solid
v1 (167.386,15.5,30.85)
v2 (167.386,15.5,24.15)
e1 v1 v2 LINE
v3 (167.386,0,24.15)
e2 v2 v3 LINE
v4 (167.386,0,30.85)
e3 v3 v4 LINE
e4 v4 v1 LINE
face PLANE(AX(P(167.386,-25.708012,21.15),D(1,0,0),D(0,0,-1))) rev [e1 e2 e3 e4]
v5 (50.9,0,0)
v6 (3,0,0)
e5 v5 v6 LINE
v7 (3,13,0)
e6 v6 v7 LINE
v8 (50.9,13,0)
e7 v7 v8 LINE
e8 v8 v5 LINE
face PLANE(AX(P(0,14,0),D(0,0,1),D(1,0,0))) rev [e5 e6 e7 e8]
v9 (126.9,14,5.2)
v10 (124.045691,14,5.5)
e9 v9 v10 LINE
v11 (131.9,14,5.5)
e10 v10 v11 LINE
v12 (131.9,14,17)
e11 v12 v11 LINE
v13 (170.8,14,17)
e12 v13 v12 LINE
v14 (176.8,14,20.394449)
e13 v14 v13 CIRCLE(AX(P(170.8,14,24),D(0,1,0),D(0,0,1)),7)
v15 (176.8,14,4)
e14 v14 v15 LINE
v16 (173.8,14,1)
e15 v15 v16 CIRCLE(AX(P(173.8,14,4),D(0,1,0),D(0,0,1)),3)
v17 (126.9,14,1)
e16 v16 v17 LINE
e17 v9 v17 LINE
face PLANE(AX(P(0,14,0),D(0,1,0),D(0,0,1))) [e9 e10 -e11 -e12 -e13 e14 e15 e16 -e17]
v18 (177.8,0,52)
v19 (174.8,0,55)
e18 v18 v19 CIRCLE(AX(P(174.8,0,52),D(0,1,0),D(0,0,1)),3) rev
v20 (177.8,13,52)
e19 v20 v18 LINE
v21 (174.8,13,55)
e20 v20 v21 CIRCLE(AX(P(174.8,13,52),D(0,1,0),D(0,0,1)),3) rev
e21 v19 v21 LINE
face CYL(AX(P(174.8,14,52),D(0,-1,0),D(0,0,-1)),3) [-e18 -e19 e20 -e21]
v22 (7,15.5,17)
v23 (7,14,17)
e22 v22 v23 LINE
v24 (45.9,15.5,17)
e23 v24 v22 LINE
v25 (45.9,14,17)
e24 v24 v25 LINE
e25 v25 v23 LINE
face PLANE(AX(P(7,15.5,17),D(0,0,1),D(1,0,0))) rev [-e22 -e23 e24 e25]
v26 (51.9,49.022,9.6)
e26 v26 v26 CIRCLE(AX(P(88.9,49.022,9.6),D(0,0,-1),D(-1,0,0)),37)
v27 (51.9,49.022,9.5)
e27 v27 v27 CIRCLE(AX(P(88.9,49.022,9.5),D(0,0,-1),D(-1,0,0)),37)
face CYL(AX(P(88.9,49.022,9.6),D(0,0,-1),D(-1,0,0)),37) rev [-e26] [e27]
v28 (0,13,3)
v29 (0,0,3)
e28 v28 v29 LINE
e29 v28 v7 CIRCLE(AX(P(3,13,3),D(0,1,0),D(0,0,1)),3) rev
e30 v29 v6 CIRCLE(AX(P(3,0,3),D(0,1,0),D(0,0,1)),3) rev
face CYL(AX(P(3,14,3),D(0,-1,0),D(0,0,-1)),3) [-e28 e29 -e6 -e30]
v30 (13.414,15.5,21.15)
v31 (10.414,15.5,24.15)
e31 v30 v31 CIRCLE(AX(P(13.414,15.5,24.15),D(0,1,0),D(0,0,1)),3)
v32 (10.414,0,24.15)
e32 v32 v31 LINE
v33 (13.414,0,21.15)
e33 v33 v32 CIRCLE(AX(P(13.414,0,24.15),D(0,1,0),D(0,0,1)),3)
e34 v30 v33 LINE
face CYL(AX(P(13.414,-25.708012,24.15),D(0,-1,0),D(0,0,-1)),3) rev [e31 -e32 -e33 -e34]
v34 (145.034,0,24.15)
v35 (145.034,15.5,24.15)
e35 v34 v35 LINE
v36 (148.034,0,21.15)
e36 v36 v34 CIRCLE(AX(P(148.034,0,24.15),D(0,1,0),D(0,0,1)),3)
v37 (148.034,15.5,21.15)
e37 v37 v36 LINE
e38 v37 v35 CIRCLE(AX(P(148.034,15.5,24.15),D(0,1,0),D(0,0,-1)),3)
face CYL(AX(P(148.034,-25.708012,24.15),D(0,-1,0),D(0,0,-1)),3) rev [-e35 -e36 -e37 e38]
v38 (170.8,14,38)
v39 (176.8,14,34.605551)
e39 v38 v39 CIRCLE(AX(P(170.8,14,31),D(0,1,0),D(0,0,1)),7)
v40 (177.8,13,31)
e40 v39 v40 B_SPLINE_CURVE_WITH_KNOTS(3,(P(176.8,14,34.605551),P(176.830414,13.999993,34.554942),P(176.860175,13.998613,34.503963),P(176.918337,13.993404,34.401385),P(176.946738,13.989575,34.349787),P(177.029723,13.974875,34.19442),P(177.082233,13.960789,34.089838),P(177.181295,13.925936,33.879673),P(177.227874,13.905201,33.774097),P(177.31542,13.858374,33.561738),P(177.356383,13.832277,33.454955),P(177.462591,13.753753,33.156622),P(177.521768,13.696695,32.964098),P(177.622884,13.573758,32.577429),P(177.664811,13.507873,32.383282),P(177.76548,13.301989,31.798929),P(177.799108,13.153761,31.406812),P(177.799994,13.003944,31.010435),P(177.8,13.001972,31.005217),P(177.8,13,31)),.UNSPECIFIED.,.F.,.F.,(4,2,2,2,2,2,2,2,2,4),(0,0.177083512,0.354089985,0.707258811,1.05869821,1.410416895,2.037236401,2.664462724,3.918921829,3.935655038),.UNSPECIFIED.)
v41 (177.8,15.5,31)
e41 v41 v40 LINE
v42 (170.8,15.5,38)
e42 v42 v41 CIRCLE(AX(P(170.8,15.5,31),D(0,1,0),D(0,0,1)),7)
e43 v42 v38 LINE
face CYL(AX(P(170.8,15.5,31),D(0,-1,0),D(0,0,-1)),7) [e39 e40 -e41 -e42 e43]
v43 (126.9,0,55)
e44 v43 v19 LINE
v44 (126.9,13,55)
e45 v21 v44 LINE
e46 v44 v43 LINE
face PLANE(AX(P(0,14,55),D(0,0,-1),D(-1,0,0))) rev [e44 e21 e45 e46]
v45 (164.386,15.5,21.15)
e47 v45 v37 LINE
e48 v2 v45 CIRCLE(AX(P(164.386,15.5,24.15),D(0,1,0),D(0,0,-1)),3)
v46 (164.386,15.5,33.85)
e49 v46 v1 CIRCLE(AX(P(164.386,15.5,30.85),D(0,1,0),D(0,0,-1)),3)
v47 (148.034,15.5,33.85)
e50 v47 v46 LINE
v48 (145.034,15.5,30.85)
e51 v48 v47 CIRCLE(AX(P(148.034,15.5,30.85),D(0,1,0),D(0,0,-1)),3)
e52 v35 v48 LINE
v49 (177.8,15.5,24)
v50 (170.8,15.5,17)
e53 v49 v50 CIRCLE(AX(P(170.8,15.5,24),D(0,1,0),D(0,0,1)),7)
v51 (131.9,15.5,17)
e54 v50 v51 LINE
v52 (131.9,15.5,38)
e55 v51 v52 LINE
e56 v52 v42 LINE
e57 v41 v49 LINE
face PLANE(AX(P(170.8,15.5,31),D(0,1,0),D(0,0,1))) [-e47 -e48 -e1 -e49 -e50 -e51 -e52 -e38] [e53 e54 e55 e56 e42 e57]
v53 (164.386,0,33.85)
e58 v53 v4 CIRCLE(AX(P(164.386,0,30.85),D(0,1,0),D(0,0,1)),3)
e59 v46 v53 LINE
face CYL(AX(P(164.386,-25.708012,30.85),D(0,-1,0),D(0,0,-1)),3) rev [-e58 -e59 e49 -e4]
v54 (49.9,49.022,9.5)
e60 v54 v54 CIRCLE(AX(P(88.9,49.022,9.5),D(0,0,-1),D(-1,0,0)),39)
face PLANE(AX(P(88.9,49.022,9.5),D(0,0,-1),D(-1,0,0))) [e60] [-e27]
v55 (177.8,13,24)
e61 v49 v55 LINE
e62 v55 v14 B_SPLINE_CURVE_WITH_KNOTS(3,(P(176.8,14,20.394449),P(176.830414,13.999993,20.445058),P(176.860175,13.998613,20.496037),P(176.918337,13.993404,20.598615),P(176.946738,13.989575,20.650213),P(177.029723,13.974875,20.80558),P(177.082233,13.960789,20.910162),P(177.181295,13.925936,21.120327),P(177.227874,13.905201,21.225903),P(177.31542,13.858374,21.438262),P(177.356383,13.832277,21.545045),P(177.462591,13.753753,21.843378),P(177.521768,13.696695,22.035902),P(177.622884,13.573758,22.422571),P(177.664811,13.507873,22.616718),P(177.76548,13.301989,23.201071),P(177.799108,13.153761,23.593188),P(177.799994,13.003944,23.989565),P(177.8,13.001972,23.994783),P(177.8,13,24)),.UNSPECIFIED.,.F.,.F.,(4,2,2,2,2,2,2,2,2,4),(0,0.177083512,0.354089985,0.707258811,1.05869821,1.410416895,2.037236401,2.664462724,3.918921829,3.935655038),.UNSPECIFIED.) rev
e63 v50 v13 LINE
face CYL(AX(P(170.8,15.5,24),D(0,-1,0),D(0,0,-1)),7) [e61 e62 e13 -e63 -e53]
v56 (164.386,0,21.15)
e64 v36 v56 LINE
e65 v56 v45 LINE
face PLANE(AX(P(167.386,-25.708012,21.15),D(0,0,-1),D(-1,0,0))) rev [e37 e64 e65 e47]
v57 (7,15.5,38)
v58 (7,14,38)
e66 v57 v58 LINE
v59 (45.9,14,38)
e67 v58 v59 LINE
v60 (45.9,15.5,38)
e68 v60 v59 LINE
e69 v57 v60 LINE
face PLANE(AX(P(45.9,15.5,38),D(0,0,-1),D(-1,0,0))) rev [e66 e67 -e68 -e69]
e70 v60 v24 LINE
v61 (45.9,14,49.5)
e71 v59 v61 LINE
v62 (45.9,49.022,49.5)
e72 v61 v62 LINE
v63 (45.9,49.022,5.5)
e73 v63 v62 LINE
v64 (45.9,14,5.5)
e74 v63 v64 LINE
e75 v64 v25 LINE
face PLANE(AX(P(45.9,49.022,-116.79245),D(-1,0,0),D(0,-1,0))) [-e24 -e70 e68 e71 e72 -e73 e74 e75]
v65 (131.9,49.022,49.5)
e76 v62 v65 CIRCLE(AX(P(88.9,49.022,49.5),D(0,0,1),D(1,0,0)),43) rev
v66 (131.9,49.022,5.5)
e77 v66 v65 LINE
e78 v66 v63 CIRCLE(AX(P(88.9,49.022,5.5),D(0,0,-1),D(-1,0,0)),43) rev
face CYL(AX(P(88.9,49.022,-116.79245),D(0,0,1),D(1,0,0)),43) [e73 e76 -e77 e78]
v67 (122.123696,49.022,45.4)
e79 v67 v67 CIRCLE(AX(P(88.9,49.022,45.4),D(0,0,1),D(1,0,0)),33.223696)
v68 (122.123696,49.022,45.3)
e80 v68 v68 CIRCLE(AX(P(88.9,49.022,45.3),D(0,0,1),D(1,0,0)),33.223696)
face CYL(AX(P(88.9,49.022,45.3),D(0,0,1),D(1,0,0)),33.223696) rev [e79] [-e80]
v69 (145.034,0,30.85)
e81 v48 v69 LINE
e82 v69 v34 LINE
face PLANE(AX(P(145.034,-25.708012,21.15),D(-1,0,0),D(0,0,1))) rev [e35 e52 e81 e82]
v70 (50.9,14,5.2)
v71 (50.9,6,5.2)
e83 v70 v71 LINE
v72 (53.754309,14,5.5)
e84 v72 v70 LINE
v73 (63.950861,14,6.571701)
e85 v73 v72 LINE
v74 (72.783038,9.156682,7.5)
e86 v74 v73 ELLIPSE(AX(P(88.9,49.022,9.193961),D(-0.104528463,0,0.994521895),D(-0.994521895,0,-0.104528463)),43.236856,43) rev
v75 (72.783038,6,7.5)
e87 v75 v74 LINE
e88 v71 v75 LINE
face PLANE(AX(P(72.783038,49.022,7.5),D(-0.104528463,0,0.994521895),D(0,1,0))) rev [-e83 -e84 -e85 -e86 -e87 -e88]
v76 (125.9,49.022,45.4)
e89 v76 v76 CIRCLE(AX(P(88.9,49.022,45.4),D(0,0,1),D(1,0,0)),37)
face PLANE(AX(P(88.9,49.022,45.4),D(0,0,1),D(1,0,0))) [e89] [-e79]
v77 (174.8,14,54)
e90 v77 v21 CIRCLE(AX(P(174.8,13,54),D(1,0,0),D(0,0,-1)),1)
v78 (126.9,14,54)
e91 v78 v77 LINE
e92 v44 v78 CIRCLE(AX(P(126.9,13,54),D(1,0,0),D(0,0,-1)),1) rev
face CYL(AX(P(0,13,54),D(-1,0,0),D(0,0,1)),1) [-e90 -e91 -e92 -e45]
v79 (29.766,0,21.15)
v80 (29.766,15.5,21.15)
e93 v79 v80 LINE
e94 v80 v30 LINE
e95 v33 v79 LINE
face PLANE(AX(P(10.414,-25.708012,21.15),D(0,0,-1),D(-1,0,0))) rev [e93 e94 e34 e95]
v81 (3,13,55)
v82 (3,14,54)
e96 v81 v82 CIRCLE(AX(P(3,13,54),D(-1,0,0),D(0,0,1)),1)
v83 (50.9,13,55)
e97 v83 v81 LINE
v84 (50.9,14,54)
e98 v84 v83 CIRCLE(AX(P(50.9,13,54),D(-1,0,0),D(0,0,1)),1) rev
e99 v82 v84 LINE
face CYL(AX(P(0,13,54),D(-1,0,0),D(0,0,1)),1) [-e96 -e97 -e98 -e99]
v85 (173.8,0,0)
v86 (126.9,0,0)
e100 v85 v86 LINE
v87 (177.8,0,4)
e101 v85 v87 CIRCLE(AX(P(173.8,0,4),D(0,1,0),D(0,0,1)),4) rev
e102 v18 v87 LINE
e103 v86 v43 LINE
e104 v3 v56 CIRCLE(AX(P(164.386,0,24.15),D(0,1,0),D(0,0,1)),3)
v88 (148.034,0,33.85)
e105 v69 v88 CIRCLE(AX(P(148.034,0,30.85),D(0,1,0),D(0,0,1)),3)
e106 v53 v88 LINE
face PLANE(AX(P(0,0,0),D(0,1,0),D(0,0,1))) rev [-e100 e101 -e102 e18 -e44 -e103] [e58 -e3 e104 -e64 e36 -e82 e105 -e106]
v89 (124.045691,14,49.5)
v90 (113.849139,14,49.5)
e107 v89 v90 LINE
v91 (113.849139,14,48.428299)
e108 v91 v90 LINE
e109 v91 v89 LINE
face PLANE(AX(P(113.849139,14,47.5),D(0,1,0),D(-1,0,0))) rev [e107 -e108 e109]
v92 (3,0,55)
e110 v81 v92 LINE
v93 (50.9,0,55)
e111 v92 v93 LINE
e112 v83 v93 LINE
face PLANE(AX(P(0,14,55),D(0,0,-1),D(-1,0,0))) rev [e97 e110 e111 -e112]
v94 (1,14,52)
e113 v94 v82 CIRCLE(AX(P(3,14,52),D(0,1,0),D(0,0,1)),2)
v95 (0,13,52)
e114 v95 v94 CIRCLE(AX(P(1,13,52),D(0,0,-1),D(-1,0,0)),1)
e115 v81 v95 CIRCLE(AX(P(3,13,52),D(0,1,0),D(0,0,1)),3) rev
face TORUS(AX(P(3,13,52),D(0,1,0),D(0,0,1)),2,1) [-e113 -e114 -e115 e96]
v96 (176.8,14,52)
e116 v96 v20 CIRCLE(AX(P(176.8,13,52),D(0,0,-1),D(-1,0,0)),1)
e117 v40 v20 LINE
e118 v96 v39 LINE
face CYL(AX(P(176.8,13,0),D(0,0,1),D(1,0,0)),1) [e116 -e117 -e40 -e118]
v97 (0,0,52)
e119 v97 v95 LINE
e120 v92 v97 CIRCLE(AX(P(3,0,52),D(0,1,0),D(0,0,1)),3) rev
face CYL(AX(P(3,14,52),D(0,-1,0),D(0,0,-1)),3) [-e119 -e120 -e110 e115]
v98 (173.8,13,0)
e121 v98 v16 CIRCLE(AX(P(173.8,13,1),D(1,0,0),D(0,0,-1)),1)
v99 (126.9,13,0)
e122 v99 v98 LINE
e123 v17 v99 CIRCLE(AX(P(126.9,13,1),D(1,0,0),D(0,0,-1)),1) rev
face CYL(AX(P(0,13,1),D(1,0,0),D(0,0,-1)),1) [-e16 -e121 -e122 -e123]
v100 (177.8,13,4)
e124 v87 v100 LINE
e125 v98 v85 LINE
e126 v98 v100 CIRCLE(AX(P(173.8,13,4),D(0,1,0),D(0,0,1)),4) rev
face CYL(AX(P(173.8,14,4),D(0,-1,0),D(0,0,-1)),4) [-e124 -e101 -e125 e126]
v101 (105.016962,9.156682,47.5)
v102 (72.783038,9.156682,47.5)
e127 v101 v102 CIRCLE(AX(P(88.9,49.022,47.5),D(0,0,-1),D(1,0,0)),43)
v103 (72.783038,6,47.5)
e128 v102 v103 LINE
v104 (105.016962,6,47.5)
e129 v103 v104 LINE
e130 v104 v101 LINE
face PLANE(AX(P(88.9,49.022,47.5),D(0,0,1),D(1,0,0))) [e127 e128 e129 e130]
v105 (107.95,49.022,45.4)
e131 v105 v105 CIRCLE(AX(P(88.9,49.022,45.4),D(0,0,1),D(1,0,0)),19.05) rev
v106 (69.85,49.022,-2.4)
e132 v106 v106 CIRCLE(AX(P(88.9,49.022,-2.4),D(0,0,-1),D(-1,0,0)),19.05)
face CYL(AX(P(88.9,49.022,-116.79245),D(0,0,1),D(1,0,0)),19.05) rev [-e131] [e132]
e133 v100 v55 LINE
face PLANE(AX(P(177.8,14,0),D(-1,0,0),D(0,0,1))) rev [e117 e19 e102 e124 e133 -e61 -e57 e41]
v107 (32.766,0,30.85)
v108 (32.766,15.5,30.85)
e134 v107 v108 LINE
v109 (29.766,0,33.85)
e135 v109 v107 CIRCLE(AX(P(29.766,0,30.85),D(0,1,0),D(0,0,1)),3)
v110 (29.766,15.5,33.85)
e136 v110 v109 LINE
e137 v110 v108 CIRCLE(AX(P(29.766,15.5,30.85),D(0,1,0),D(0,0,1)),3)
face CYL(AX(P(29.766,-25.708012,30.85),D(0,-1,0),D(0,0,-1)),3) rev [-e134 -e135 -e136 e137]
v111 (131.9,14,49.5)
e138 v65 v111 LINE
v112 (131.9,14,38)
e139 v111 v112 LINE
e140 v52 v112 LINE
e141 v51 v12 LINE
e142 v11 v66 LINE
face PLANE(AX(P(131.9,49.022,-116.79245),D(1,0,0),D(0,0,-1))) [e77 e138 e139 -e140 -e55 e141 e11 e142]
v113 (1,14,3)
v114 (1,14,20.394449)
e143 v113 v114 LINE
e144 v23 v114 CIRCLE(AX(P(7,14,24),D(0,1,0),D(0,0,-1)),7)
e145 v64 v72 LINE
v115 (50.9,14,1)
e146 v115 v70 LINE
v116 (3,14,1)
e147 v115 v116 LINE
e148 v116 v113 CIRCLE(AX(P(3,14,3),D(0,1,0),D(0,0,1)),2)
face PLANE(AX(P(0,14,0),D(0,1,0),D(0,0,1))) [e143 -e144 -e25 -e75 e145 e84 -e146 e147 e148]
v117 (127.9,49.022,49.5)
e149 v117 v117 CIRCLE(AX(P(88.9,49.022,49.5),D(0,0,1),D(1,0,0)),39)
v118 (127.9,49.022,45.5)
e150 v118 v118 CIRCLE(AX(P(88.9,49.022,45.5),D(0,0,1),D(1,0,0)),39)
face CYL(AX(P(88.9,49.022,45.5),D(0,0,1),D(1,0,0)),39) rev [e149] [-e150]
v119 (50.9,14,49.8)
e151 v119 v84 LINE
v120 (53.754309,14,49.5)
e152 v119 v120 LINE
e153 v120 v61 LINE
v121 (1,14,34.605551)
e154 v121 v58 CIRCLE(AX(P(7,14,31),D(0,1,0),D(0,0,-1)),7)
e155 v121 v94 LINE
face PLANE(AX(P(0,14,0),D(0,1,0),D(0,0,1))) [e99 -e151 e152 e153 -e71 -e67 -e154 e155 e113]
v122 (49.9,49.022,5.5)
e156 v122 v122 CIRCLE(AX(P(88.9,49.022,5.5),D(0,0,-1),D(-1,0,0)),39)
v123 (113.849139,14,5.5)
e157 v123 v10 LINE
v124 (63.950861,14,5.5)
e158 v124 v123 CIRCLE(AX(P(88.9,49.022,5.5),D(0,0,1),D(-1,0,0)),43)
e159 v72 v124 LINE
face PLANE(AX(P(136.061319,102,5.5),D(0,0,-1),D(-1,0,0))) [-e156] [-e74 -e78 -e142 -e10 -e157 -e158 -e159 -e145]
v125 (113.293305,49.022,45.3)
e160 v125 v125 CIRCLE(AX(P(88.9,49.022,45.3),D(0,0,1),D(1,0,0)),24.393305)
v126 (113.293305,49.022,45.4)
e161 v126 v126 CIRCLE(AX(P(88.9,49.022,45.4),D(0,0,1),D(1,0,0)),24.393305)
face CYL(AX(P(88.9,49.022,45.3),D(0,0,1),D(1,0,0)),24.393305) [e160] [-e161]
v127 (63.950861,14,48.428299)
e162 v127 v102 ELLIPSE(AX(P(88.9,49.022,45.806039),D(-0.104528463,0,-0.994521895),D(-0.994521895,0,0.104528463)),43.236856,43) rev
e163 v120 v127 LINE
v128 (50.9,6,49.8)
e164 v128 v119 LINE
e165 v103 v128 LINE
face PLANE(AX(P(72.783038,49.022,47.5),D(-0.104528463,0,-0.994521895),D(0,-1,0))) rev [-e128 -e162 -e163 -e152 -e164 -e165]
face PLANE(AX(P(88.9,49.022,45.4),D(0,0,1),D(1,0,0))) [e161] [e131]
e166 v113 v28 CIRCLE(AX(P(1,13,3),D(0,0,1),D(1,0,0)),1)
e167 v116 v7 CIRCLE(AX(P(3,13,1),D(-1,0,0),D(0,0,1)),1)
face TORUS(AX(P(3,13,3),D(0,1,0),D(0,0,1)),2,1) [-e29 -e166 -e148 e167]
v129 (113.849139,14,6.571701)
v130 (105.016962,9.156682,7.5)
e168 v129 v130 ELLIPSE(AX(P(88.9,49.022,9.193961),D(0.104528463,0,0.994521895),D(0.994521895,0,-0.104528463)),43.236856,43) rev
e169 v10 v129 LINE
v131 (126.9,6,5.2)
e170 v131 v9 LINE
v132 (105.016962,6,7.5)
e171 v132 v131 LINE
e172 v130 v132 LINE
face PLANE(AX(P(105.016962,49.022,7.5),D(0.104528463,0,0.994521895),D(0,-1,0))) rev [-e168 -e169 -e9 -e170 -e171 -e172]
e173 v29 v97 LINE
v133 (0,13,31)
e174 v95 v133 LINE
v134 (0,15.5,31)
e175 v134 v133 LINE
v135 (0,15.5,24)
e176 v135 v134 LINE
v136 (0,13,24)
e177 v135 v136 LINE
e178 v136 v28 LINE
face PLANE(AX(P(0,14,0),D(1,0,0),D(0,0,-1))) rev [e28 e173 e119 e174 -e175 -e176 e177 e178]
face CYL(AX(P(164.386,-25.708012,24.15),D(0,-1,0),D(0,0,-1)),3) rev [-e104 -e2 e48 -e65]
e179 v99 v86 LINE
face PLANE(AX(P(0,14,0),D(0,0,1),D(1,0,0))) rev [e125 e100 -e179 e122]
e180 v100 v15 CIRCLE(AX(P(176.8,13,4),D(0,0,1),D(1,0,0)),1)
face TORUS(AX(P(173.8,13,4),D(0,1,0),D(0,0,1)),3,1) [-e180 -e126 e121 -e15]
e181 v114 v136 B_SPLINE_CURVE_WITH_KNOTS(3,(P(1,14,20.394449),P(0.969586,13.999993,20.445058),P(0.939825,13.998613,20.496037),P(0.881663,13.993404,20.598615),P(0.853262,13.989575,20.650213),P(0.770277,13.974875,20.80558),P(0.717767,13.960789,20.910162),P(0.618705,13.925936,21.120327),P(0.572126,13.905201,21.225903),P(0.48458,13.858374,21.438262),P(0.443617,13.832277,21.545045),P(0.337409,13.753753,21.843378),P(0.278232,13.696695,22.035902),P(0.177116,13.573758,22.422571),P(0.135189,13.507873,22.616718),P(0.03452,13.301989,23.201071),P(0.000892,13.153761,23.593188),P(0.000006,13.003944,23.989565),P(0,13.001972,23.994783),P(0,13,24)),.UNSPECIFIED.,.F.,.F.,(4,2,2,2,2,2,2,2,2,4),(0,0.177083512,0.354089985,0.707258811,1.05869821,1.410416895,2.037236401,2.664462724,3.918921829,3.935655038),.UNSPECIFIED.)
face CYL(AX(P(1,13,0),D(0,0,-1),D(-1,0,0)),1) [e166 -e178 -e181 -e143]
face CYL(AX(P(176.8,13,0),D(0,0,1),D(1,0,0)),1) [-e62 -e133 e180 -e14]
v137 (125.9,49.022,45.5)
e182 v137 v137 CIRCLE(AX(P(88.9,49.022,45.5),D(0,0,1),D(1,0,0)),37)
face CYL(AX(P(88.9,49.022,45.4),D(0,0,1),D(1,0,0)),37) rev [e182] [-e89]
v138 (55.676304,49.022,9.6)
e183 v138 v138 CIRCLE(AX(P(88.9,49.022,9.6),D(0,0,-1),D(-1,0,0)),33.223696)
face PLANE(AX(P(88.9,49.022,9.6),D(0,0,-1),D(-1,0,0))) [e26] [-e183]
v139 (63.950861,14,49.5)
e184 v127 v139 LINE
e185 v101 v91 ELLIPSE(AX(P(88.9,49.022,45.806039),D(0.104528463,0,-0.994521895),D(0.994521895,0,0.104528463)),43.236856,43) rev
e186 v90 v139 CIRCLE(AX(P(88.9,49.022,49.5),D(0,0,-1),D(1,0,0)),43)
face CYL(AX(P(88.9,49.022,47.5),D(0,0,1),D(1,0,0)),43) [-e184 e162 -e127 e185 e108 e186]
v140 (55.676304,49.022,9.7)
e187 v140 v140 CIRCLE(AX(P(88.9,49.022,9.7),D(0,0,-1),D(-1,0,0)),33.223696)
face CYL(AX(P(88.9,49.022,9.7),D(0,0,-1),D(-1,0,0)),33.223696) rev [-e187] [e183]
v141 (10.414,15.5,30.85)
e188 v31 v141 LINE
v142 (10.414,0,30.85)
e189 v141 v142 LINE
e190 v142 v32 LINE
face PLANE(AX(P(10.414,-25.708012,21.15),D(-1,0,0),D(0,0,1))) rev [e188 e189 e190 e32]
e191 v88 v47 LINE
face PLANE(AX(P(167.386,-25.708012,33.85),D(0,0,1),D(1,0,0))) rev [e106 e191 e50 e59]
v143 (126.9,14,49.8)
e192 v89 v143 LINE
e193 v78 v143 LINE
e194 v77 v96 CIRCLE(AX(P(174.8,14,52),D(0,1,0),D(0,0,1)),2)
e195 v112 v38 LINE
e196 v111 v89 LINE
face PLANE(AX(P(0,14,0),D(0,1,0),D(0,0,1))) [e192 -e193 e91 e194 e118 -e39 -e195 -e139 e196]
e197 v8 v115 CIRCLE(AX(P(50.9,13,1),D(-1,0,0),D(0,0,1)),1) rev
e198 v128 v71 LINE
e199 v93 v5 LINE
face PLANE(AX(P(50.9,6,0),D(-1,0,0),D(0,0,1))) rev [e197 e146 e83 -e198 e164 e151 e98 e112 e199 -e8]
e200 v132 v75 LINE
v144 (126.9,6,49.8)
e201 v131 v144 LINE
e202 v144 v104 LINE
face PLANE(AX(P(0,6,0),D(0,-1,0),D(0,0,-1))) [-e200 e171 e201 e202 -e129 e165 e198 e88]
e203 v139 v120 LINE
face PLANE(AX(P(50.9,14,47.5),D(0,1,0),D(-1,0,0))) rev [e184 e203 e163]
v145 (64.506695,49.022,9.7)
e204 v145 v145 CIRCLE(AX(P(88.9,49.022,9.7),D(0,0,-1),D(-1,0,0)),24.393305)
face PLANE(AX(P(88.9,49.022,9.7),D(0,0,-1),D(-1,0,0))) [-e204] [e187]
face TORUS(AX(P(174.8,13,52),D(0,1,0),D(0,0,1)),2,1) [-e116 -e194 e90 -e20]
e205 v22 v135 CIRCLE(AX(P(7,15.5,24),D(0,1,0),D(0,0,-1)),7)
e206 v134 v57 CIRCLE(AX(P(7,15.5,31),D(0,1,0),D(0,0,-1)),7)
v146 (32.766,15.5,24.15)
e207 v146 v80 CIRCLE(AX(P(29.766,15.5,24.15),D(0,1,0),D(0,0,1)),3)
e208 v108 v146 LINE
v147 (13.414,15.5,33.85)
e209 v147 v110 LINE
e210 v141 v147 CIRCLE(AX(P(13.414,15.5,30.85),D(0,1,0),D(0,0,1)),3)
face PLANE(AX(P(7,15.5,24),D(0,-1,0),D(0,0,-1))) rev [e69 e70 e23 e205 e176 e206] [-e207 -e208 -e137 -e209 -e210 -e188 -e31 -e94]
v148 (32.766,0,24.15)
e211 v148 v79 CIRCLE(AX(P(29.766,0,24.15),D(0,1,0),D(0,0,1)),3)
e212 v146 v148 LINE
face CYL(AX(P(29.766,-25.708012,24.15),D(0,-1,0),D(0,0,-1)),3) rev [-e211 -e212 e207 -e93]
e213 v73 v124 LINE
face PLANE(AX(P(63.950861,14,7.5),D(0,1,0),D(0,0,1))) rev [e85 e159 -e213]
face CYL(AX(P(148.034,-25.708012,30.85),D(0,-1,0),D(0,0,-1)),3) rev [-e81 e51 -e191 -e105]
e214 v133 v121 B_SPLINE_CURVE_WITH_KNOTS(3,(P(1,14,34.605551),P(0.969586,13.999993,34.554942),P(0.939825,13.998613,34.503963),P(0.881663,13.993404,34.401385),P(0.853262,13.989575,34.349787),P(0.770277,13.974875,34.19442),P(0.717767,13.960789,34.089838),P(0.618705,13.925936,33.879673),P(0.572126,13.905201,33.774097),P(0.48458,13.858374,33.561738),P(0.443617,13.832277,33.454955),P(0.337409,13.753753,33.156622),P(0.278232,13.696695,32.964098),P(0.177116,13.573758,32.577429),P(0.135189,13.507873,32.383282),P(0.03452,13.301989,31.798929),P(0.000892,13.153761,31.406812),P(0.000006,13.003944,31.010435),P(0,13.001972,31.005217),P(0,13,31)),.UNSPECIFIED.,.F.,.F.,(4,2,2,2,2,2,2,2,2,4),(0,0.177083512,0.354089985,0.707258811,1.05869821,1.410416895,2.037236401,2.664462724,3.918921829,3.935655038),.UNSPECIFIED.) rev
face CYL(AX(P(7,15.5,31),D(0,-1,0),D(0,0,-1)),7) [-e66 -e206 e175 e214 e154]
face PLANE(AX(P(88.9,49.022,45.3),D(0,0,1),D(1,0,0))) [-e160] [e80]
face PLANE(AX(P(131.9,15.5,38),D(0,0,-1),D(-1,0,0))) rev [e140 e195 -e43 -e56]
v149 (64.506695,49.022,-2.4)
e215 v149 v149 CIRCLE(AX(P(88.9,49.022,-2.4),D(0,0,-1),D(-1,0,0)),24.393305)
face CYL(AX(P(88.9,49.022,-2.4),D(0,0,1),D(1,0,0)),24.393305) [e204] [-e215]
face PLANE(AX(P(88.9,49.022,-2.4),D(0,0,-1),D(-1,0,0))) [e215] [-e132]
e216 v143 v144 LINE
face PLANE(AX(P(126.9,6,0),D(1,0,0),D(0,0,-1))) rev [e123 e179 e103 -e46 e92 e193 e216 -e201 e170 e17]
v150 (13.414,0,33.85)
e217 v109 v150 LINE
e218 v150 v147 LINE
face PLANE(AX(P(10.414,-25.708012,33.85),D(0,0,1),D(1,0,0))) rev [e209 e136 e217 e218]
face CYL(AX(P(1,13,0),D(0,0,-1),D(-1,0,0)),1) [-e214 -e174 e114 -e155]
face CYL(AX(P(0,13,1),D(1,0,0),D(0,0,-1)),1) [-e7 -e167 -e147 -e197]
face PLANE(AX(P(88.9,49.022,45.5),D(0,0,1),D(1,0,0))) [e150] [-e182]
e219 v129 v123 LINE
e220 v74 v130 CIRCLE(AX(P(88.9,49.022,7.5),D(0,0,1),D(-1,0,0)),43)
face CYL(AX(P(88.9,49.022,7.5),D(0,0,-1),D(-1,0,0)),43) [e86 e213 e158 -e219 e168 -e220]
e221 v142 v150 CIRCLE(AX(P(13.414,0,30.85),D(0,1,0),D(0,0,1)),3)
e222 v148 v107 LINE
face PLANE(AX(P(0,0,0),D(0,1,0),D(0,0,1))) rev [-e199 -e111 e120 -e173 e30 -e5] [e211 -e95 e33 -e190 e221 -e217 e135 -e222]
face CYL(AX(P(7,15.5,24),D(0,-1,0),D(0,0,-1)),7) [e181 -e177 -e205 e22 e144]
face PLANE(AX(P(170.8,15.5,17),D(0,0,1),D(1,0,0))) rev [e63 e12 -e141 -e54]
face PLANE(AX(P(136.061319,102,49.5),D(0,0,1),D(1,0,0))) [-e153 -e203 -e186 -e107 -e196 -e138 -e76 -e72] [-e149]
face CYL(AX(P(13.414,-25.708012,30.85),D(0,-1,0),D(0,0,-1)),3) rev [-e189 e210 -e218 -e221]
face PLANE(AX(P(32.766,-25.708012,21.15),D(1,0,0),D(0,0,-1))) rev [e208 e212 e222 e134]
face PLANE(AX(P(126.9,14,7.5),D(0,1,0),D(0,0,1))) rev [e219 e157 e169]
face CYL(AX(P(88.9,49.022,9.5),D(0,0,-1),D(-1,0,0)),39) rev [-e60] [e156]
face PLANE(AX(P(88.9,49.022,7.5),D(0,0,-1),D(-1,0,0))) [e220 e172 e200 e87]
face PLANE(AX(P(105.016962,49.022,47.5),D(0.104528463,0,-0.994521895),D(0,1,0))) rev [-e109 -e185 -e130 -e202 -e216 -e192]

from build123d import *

# Parameters (mm, degrees)
CROQUIS1_W              = 177.8
CROQUIS1_H              = 55
SALIENTE_EXTRUIR1_DEPTH = 14
CROQUIS2_R              = 19.05
SALIENTE_EXTRUIR2_DEPTH = 55
CROQUIS3_W              = 102.441548107
CROQUIS3_H              = 5.5
CORTAR_EXTRUIR1_DEPTH   = 88
CROQUIS4_W              = 76
CROQUIS4_H              = 55
CORTAR_EXTRUIR2_DEPTH   = 6
CROQUIS5_W              = 76
CROQUIS5_H              = 5.5
CORTAR_EXTRUIR3_DEPTH   = 20
CROQUIS6_R              = 39
CORTAR_EXTRUIR4_DEPTH   = 4
CORTAR_EXTRUIR5_START   = -4
CROQUIS7_R              = 39
CORTAR_EXTRUIR5_DEPTH   = 4
CROQUIS8_R              = 37
CORTAR_EXTRUIR6_DEPTH   = 0.1
CROQUIS9_R              = 24.393304637
CROQUIS9_R_2            = 19.05
SALIENTE_EXTRUIR3_DEPTH = 12
CORTAR_EXTRUIR7_START   = -0.1
CROQUIS11_R             = 33.223696355
CROQUIS11_R_2           = 24.393304637
CORTAR_EXTRUIR7_DEPTH   = 0.1
REDONDEO1_R             = 3
CORTAR_EXTRUIR8_START   = -0.1
CROQUIS12_R             = 37
CORTAR_EXTRUIR8_DEPTH   = 0.1
CROQUIS13_R             = 33.223696355
CROQUIS13_R_2           = 24.393304637
CORTAR_EXTRUIR9_DEPTH   = 0.1
CORTAR_EXTRUIR10_DEPTH  = 2
CHAFL_N1_SIZE           = 2.3
CHAFL_N1_SIZE_2         = 21.883038245
CORTAR_EXTRUIR11_START  = -2
CORTAR_EXTRUIR11_DEPTH  = 2
CHAFL_N2_SIZE           = 2.3
CHAFL_N2_SIZE_2         = 21.883038245
REDONDEO3_R             = 4
CROQUIS17_W             = 22.352
CROQUIS17_H             = 12.7
CORTAR_EXTRUIR12_DEPTH  = 14
REDONDEO4_R             = 3
SALIENTE_EXTRUIR4_DEPTH = 1.5
REDONDEO5_R             = 1


with BuildPart() as part:
    # Croquis1 → Saliente-Extruir1 (new body)
    with BuildSketch(Plane(origin=(0, 0, 0), x_dir=(1, 0, 0), z_dir=(0, 1, 0))):
        with Locations((88.9, -27.5)):
            Rectangle(CROQUIS1_W, CROQUIS1_H)
    extrude(amount=SALIENTE_EXTRUIR1_DEPTH)

    # Croquis2 → Saliente-Extruir2 (add)
    with BuildSketch(Plane.XY.offset(55)):
        with BuildLine():
            Line((45.9, 49.022), (45.9, 13))
            Line((45.9, 13), (131.9, 13))
            Line((131.9, 13), (131.9, 49.022))
            ThreePointArc((131.9, 49.022), (88.9, 92.022), (45.9, 49.022))
        make_face()
        with Locations((88.9, 49.022)):
            Circle(CROQUIS2_R, mode=Mode.SUBTRACT)
    extrude(amount=-SALIENTE_EXTRUIR2_DEPTH)

    # Croquis3 → Cortar-Extruir1 (cut)
    with BuildSketch(Plane(origin=(0, 14, 0), x_dir=(1, 0, 0), z_dir=(0, 1, 0))):
        with Locations((84.840544714, -2.75)):
            Rectangle(CROQUIS3_W, CROQUIS3_H)
        with Locations((84.840544714, -52.25)):
            Rectangle(CROQUIS3_W, CROQUIS3_H)
    extrude(amount=CORTAR_EXTRUIR1_DEPTH, mode=Mode.SUBTRACT)

    # Croquis4 → Cortar-Extruir2 (cut)
    with BuildSketch(Plane.XZ):
        with Locations((88.9, 27.5)):
            Rectangle(CROQUIS4_W, CROQUIS4_H)
    extrude(amount=-CORTAR_EXTRUIR2_DEPTH, mode=Mode.SUBTRACT)

    # Croquis5 → Cortar-Extruir3 (cut)
    with BuildSketch(Plane.XZ.offset(-6)):
        with Locations((88.9, 2.75)):
            Rectangle(CROQUIS5_W, CROQUIS5_H)
        with Locations((88.9, 52.25)):
            Rectangle(CROQUIS5_W, CROQUIS5_H)
    extrude(amount=-CORTAR_EXTRUIR3_DEPTH, mode=Mode.SUBTRACT)

    # Croquis6 → Cortar-Extruir4 (cut)
    with BuildSketch(Plane.XY.offset(49.5)):
        with Locations((88.9, 49.022)):
            Circle(CROQUIS6_R)
    extrude(amount=-CORTAR_EXTRUIR4_DEPTH, mode=Mode.SUBTRACT)

    # Croquis7 → Cortar-Extruir5 (cut)
    with BuildSketch(Plane(origin=(0, 0, 5.5), x_dir=(-1, 0, 0), z_dir=(0, 0, -1)).offset(CORTAR_EXTRUIR5_START)):
        with Locations(Location((-88.9, 49.022, 0), (0, 0, 180))):
            Circle(CROQUIS7_R)
    extrude(amount=CORTAR_EXTRUIR5_DEPTH, mode=Mode.SUBTRACT)

    # Croquis8 → Cortar-Extruir6 (cut)
    with BuildSketch(Plane(origin=(0, 0, 9.5), x_dir=(-1, 0, 0), z_dir=(0, 0, -1))):
        with Locations((-88.9, 49.022)):
            Circle(CROQUIS8_R)
    extrude(amount=-CORTAR_EXTRUIR6_DEPTH, mode=Mode.SUBTRACT)

    # Croquis9 → Saliente-Extruir3 (add)
    with BuildSketch(Plane(origin=(0, 0, 9.6), x_dir=(-1, 0, 0), z_dir=(0, 0, -1))):
        with Locations((-88.9, 49.022)):
            Circle(CROQUIS9_R)
        with Locations(Location((-88.9, 49.022, 0), (0, 0, 180))):
            Circle(CROQUIS9_R_2, mode=Mode.SUBTRACT)
    extrude(amount=SALIENTE_EXTRUIR3_DEPTH)

    # Croquis11 → Cortar-Extruir7 (cut)
    with BuildSketch(Plane(origin=(0, 0, 9.6), x_dir=(-1, 0, 0), z_dir=(0, 0, -1)).offset(CORTAR_EXTRUIR7_START)):
        with Locations((-88.9, 49.022)):
            Circle(CROQUIS11_R)
        with Locations((-88.9, 49.022)):
            Circle(CROQUIS11_R_2, mode=Mode.SUBTRACT)
    extrude(amount=CORTAR_EXTRUIR7_DEPTH, mode=Mode.SUBTRACT)

    # Redondeo1
    redondeo1_edges = [part.edges().sort_by_distance(p)[0] for p in [
        (0, 7, 0),
        (177.8, 7, 55),
        (0, 7, 55),
    ]]
    fillet(redondeo1_edges, radius=REDONDEO1_R)

    # Croquis12 → Cortar-Extruir8 (cut)
    with BuildSketch(Plane.XY.offset(45.5).offset(CORTAR_EXTRUIR8_START)):
        with Locations(Location((88.9, 49.022, 0), (0, 0, 180))):
            Circle(CROQUIS12_R)
    extrude(amount=CORTAR_EXTRUIR8_DEPTH, mode=Mode.SUBTRACT)

    # Croquis13 → Cortar-Extruir9 (cut)
    with BuildSketch(Plane.XY.offset(45.4)):
        with Locations(Location((88.9, 49.022, 0), (0, 0, 180))):
            Circle(CROQUIS13_R)
        with Locations(Location((88.9, 49.022, 0), (0, 0, 180))):
            Circle(CROQUIS13_R_2, mode=Mode.SUBTRACT)
    extrude(amount=-CORTAR_EXTRUIR9_DEPTH, mode=Mode.SUBTRACT)

    # Croquis15 → Cortar-Extruir10 (cut)
    with BuildSketch(Plane.XY.offset(49.5)):
        with BuildLine():
            Line((50.9, 14), (63.950861418, 14))
            ThreePointArc((63.950861418, 14), (88.9, 6.022), (113.849138582, 14))
            Line((113.849138582, 14), (126.9, 14))
            Line((126.9, 14), (126.9, 6))
            Line((126.9, 6), (50.9, 6))
            Line((50.9, 6), (50.9, 14))
        make_face()
    extrude(amount=-CORTAR_EXTRUIR10_DEPTH, mode=Mode.SUBTRACT)

    # Chaflán1
    # the kernel refuses this chamfer: 21.883038245, 2.3 mm, written as the material it adds along each edge
    with BuildSketch(Plane(origin=(126.9, 14, 47.5), x_dir=(0.3420524322258251, 0, 0.9396808679591159), z_dir=(0, -1, 0))) as chafl_n1_piece_1_section:
        Polygon((CHAFL_N1_SIZE * 0.939680867959, CHAFL_N1_SIZE * 0.342052432226), (-CHAFL_N1_SIZE_2 * 0.342052432221, CHAFL_N1_SIZE_2 * 0.939680867947), (0, 0), align=None)
    chafl_n1_piece_1 = extrude(amount=8, mode=Mode.PRIVATE)
    chafl_n1_piece_1 = chafl_n1_piece_1 - Plane(origin=(88.9, 49.022, 49.6), x_dir=(1, 0, 0), z_dir=(0, 0, 1)) * Cylinder(43, 99, mode=Mode.PRIVATE)
    add(chafl_n1_piece_1)
    with BuildSketch(Plane(origin=(50.9, 6, 47.5), x_dir=(0.999991915182878, 0, -0.00402114024619802), z_dir=(0, 1, 0))) as chafl_n1_piece_2_section:
        Polygon((CHAFL_N1_SIZE_2 * 0.99999191517, -CHAFL_N1_SIZE_2 * 0.00402114024615), (-CHAFL_N1_SIZE * 0.0040211402462, -CHAFL_N1_SIZE * 0.999991915183), (0, 0), align=None)
    chafl_n1_piece_2 = extrude(amount=8, mode=Mode.PRIVATE)
    chafl_n1_piece_2 = chafl_n1_piece_2 - Plane(origin=(88.9, 49.022, 48.263647877), x_dir=(1, 0, 0), z_dir=(0, 0, 1)) * Cylinder(43, 104, mode=Mode.PRIVATE)
    add(chafl_n1_piece_2)

    # Croquis16 → Cortar-Extruir11 (cut)
    with BuildSketch(Plane(origin=(0, 0, 5.5), x_dir=(-1, 0, 0), z_dir=(0, 0, -1)).offset(CORTAR_EXTRUIR11_START)):
        with BuildLine():
            Line((-126.9, 14), (-113.849138582, 14))
            ThreePointArc((-113.849138582, 14), (-88.9, 6.022), (-63.950861418, 14))
            Line((-63.950861418, 14), (-50.9, 14))
            Line((-50.9, 14), (-50.9, 6))
            Line((-50.9, 6), (-126.9, 6))
            Line((-126.9, 6), (-126.9, 14))
        make_face()
    extrude(amount=CORTAR_EXTRUIR11_DEPTH, mode=Mode.SUBTRACT)

    # Chaflán2
    # the kernel refuses this chamfer: 21.883038245, 2.3 mm, written as the material it adds along each edge
    with BuildSketch(Plane(origin=(50.9, 14, 7.5), x_dir=(-0.3420524322258248, 0, -0.939680867959116), z_dir=(0, -1, 0))) as chafl_n2_piece_1_section:
        Polygon((CHAFL_N2_SIZE * 0.939680867959, CHAFL_N2_SIZE * 0.342052432226), (-CHAFL_N2_SIZE_2 * 0.342052432221, CHAFL_N2_SIZE_2 * 0.939680867947), (0, 0), align=None)
    chafl_n2_piece_1 = extrude(amount=8, mode=Mode.PRIVATE)
    chafl_n2_piece_1 = chafl_n2_piece_1 - Plane(origin=(88.9, 49.022, 5.4), x_dir=(1, 0, 0), z_dir=(0, 0, 1)) * Cylinder(39, 99, mode=Mode.PRIVATE)
    add(chafl_n2_piece_1)
    with BuildSketch(Plane(origin=(126.9, 6, 7.5), x_dir=(0.3420524322258251, 0, -0.9396808679591159), z_dir=(0, 1, 0))) as chafl_n2_piece_2_section:
        Polygon((CHAFL_N2_SIZE * 0.939680867959, CHAFL_N2_SIZE * 0.342052432226), (-CHAFL_N2_SIZE_2 * 0.342052432221, CHAFL_N2_SIZE_2 * 0.939680867947), (0, 0), align=None)
    chafl_n2_piece_2 = extrude(amount=8, mode=Mode.PRIVATE)
    chafl_n2_piece_2 = chafl_n2_piece_2 - Plane(origin=(88.9, 49.022, 5.4), x_dir=(1, 0, 0), z_dir=(0, 0, 1)) * Cylinder(39, 99, mode=Mode.PRIVATE)
    add(chafl_n2_piece_2)

    # Redondeo3
    redondeo3_edges = [part.edges().sort_by_distance(p)[0] for p in [
        (177.8, 7, 0),
    ]]
    fillet(redondeo3_edges, radius=REDONDEO3_R)

    # Croquis17 → Cortar-Extruir12 (cut)
    with BuildSketch(Plane(origin=(0, 14, 0), x_dir=(1, 0, 0), z_dir=(0, 1, 0))):
        with Locations((156.21, -27.5)):
            Rectangle(CROQUIS17_W, CROQUIS17_H)
        with Locations((21.59, -27.5)):
            Rectangle(CROQUIS17_W, CROQUIS17_H)
    extrude(amount=-CORTAR_EXTRUIR12_DEPTH, mode=Mode.SUBTRACT)

    # Redondeo4
    redondeo4_edges = [part.edges().sort_by_distance(p)[0] for p in [
        (145.034, 7, 33.85),
        (145.034, 7, 21.15),
        (167.386, 7, 21.15),
        (167.386, 7, 33.85),
        (10.414, 7, 33.85),
        (10.414, 7, 21.15),
        (32.766, 7, 21.15),
        (32.766, 7, 33.85),
    ]]
    fillet(redondeo4_edges, radius=REDONDEO4_R)

    # Croquis18 → Saliente-Extruir4 (add)
    # profile 1 of 2: a face of its own
    with BuildSketch(Plane(origin=(0, 14, 0), x_dir=(1, 0, 0), z_dir=(0, 1, 0))):
        with BuildLine():
            Line((45.9, -38), (7, -38))
            ThreePointArc((7, -38), (2.050252532, -35.949747468), (0, -31))
            Line((0, -31), (0, -27.5))
            Line((0, -27.5), (0, -24))
            ThreePointArc((0, -24), (2.050252532, -19.050252532), (7, -17))
            Line((7, -17), (45.9, -17))
            Line((45.9, -17), (45.9, -27.5))
            Line((45.9, -27.5), (45.9, -38))
        make_face()
        with BuildLine():
            Line((29.766, -33.85), (13.414, -33.85))
            ThreePointArc((13.414, -33.85), (11.292679656, -32.971320344), (10.414, -30.85))
            Line((10.414, -30.85), (10.414, -24.15))
            ThreePointArc((10.414, -24.15), (11.292679656, -22.028679656), (13.414, -21.15))
            Line((13.414, -21.15), (29.766, -21.15))
            ThreePointArc((29.766, -21.15), (31.887320344, -22.028679656), (32.766, -24.15))
            Line((32.766, -24.15), (32.766, -30.85))
            ThreePointArc((32.766, -30.85), (31.887320344, -32.971320344), (29.766, -33.85))
        make_face(mode=Mode.SUBTRACT)
    # profile 2 of 2: a face of its own
    with BuildSketch(Plane(origin=(0, 14, 0), x_dir=(1, 0, 0), z_dir=(0, 1, 0))):
        with BuildLine():
            Line((131.9, -27.5), (131.9, -38))
            Line((131.9, -38), (170.8, -38))
            ThreePointArc((170.8, -38), (175.749747468, -35.949747468), (177.8, -31))
            Line((177.8, -31), (177.8, -27.5))
            Line((177.8, -27.5), (177.8, -24))
            ThreePointArc((177.8, -24), (175.749747468, -19.050252532), (170.8, -17))
            Line((170.8, -17), (131.9, -17))
            Line((131.9, -17), (131.9, -27.5))
        make_face()
        with BuildLine():
            Line((167.386, -24.15), (167.386, -30.85))
            ThreePointArc((167.386, -30.85), (166.507320344, -32.971320344), (164.386, -33.85))
            Line((164.386, -33.85), (148.034, -33.85))
            ThreePointArc((148.034, -33.85), (145.912679656, -32.971320344), (145.034, -30.85))
            Line((145.034, -30.85), (145.034, -24.15))
            ThreePointArc((145.034, -24.15), (145.912679656, -22.028679656), (148.034, -21.15))
            Line((148.034, -21.15), (164.386, -21.15))
            ThreePointArc((164.386, -21.15), (166.507320344, -22.028679656), (167.386, -24.15))
        make_face(mode=Mode.SUBTRACT)
    extrude(amount=SALIENTE_EXTRUIR4_DEPTH)

    # Redondeo5
    redondeo5_edges = [part.edges().sort_by_distance(p)[0] for p in [
        (177.8, 14, 41.5),
        (176.921320344, 14, 54.121320344),
        (177.8, 14, 14),
        (176.628427125, 14, 1.171572875),
        (0, 14, 41.5),
        (0.878679656, 14, 54.121320344),
        (0, 14, 13.5),
        (0.878679656, 14, 0.878679656),
        (150.85, 14, 55),
        (150.35, 14, 0),
    ]]
    fillet(redondeo5_edges, radius=REDONDEO5_R)


solid = part.part
